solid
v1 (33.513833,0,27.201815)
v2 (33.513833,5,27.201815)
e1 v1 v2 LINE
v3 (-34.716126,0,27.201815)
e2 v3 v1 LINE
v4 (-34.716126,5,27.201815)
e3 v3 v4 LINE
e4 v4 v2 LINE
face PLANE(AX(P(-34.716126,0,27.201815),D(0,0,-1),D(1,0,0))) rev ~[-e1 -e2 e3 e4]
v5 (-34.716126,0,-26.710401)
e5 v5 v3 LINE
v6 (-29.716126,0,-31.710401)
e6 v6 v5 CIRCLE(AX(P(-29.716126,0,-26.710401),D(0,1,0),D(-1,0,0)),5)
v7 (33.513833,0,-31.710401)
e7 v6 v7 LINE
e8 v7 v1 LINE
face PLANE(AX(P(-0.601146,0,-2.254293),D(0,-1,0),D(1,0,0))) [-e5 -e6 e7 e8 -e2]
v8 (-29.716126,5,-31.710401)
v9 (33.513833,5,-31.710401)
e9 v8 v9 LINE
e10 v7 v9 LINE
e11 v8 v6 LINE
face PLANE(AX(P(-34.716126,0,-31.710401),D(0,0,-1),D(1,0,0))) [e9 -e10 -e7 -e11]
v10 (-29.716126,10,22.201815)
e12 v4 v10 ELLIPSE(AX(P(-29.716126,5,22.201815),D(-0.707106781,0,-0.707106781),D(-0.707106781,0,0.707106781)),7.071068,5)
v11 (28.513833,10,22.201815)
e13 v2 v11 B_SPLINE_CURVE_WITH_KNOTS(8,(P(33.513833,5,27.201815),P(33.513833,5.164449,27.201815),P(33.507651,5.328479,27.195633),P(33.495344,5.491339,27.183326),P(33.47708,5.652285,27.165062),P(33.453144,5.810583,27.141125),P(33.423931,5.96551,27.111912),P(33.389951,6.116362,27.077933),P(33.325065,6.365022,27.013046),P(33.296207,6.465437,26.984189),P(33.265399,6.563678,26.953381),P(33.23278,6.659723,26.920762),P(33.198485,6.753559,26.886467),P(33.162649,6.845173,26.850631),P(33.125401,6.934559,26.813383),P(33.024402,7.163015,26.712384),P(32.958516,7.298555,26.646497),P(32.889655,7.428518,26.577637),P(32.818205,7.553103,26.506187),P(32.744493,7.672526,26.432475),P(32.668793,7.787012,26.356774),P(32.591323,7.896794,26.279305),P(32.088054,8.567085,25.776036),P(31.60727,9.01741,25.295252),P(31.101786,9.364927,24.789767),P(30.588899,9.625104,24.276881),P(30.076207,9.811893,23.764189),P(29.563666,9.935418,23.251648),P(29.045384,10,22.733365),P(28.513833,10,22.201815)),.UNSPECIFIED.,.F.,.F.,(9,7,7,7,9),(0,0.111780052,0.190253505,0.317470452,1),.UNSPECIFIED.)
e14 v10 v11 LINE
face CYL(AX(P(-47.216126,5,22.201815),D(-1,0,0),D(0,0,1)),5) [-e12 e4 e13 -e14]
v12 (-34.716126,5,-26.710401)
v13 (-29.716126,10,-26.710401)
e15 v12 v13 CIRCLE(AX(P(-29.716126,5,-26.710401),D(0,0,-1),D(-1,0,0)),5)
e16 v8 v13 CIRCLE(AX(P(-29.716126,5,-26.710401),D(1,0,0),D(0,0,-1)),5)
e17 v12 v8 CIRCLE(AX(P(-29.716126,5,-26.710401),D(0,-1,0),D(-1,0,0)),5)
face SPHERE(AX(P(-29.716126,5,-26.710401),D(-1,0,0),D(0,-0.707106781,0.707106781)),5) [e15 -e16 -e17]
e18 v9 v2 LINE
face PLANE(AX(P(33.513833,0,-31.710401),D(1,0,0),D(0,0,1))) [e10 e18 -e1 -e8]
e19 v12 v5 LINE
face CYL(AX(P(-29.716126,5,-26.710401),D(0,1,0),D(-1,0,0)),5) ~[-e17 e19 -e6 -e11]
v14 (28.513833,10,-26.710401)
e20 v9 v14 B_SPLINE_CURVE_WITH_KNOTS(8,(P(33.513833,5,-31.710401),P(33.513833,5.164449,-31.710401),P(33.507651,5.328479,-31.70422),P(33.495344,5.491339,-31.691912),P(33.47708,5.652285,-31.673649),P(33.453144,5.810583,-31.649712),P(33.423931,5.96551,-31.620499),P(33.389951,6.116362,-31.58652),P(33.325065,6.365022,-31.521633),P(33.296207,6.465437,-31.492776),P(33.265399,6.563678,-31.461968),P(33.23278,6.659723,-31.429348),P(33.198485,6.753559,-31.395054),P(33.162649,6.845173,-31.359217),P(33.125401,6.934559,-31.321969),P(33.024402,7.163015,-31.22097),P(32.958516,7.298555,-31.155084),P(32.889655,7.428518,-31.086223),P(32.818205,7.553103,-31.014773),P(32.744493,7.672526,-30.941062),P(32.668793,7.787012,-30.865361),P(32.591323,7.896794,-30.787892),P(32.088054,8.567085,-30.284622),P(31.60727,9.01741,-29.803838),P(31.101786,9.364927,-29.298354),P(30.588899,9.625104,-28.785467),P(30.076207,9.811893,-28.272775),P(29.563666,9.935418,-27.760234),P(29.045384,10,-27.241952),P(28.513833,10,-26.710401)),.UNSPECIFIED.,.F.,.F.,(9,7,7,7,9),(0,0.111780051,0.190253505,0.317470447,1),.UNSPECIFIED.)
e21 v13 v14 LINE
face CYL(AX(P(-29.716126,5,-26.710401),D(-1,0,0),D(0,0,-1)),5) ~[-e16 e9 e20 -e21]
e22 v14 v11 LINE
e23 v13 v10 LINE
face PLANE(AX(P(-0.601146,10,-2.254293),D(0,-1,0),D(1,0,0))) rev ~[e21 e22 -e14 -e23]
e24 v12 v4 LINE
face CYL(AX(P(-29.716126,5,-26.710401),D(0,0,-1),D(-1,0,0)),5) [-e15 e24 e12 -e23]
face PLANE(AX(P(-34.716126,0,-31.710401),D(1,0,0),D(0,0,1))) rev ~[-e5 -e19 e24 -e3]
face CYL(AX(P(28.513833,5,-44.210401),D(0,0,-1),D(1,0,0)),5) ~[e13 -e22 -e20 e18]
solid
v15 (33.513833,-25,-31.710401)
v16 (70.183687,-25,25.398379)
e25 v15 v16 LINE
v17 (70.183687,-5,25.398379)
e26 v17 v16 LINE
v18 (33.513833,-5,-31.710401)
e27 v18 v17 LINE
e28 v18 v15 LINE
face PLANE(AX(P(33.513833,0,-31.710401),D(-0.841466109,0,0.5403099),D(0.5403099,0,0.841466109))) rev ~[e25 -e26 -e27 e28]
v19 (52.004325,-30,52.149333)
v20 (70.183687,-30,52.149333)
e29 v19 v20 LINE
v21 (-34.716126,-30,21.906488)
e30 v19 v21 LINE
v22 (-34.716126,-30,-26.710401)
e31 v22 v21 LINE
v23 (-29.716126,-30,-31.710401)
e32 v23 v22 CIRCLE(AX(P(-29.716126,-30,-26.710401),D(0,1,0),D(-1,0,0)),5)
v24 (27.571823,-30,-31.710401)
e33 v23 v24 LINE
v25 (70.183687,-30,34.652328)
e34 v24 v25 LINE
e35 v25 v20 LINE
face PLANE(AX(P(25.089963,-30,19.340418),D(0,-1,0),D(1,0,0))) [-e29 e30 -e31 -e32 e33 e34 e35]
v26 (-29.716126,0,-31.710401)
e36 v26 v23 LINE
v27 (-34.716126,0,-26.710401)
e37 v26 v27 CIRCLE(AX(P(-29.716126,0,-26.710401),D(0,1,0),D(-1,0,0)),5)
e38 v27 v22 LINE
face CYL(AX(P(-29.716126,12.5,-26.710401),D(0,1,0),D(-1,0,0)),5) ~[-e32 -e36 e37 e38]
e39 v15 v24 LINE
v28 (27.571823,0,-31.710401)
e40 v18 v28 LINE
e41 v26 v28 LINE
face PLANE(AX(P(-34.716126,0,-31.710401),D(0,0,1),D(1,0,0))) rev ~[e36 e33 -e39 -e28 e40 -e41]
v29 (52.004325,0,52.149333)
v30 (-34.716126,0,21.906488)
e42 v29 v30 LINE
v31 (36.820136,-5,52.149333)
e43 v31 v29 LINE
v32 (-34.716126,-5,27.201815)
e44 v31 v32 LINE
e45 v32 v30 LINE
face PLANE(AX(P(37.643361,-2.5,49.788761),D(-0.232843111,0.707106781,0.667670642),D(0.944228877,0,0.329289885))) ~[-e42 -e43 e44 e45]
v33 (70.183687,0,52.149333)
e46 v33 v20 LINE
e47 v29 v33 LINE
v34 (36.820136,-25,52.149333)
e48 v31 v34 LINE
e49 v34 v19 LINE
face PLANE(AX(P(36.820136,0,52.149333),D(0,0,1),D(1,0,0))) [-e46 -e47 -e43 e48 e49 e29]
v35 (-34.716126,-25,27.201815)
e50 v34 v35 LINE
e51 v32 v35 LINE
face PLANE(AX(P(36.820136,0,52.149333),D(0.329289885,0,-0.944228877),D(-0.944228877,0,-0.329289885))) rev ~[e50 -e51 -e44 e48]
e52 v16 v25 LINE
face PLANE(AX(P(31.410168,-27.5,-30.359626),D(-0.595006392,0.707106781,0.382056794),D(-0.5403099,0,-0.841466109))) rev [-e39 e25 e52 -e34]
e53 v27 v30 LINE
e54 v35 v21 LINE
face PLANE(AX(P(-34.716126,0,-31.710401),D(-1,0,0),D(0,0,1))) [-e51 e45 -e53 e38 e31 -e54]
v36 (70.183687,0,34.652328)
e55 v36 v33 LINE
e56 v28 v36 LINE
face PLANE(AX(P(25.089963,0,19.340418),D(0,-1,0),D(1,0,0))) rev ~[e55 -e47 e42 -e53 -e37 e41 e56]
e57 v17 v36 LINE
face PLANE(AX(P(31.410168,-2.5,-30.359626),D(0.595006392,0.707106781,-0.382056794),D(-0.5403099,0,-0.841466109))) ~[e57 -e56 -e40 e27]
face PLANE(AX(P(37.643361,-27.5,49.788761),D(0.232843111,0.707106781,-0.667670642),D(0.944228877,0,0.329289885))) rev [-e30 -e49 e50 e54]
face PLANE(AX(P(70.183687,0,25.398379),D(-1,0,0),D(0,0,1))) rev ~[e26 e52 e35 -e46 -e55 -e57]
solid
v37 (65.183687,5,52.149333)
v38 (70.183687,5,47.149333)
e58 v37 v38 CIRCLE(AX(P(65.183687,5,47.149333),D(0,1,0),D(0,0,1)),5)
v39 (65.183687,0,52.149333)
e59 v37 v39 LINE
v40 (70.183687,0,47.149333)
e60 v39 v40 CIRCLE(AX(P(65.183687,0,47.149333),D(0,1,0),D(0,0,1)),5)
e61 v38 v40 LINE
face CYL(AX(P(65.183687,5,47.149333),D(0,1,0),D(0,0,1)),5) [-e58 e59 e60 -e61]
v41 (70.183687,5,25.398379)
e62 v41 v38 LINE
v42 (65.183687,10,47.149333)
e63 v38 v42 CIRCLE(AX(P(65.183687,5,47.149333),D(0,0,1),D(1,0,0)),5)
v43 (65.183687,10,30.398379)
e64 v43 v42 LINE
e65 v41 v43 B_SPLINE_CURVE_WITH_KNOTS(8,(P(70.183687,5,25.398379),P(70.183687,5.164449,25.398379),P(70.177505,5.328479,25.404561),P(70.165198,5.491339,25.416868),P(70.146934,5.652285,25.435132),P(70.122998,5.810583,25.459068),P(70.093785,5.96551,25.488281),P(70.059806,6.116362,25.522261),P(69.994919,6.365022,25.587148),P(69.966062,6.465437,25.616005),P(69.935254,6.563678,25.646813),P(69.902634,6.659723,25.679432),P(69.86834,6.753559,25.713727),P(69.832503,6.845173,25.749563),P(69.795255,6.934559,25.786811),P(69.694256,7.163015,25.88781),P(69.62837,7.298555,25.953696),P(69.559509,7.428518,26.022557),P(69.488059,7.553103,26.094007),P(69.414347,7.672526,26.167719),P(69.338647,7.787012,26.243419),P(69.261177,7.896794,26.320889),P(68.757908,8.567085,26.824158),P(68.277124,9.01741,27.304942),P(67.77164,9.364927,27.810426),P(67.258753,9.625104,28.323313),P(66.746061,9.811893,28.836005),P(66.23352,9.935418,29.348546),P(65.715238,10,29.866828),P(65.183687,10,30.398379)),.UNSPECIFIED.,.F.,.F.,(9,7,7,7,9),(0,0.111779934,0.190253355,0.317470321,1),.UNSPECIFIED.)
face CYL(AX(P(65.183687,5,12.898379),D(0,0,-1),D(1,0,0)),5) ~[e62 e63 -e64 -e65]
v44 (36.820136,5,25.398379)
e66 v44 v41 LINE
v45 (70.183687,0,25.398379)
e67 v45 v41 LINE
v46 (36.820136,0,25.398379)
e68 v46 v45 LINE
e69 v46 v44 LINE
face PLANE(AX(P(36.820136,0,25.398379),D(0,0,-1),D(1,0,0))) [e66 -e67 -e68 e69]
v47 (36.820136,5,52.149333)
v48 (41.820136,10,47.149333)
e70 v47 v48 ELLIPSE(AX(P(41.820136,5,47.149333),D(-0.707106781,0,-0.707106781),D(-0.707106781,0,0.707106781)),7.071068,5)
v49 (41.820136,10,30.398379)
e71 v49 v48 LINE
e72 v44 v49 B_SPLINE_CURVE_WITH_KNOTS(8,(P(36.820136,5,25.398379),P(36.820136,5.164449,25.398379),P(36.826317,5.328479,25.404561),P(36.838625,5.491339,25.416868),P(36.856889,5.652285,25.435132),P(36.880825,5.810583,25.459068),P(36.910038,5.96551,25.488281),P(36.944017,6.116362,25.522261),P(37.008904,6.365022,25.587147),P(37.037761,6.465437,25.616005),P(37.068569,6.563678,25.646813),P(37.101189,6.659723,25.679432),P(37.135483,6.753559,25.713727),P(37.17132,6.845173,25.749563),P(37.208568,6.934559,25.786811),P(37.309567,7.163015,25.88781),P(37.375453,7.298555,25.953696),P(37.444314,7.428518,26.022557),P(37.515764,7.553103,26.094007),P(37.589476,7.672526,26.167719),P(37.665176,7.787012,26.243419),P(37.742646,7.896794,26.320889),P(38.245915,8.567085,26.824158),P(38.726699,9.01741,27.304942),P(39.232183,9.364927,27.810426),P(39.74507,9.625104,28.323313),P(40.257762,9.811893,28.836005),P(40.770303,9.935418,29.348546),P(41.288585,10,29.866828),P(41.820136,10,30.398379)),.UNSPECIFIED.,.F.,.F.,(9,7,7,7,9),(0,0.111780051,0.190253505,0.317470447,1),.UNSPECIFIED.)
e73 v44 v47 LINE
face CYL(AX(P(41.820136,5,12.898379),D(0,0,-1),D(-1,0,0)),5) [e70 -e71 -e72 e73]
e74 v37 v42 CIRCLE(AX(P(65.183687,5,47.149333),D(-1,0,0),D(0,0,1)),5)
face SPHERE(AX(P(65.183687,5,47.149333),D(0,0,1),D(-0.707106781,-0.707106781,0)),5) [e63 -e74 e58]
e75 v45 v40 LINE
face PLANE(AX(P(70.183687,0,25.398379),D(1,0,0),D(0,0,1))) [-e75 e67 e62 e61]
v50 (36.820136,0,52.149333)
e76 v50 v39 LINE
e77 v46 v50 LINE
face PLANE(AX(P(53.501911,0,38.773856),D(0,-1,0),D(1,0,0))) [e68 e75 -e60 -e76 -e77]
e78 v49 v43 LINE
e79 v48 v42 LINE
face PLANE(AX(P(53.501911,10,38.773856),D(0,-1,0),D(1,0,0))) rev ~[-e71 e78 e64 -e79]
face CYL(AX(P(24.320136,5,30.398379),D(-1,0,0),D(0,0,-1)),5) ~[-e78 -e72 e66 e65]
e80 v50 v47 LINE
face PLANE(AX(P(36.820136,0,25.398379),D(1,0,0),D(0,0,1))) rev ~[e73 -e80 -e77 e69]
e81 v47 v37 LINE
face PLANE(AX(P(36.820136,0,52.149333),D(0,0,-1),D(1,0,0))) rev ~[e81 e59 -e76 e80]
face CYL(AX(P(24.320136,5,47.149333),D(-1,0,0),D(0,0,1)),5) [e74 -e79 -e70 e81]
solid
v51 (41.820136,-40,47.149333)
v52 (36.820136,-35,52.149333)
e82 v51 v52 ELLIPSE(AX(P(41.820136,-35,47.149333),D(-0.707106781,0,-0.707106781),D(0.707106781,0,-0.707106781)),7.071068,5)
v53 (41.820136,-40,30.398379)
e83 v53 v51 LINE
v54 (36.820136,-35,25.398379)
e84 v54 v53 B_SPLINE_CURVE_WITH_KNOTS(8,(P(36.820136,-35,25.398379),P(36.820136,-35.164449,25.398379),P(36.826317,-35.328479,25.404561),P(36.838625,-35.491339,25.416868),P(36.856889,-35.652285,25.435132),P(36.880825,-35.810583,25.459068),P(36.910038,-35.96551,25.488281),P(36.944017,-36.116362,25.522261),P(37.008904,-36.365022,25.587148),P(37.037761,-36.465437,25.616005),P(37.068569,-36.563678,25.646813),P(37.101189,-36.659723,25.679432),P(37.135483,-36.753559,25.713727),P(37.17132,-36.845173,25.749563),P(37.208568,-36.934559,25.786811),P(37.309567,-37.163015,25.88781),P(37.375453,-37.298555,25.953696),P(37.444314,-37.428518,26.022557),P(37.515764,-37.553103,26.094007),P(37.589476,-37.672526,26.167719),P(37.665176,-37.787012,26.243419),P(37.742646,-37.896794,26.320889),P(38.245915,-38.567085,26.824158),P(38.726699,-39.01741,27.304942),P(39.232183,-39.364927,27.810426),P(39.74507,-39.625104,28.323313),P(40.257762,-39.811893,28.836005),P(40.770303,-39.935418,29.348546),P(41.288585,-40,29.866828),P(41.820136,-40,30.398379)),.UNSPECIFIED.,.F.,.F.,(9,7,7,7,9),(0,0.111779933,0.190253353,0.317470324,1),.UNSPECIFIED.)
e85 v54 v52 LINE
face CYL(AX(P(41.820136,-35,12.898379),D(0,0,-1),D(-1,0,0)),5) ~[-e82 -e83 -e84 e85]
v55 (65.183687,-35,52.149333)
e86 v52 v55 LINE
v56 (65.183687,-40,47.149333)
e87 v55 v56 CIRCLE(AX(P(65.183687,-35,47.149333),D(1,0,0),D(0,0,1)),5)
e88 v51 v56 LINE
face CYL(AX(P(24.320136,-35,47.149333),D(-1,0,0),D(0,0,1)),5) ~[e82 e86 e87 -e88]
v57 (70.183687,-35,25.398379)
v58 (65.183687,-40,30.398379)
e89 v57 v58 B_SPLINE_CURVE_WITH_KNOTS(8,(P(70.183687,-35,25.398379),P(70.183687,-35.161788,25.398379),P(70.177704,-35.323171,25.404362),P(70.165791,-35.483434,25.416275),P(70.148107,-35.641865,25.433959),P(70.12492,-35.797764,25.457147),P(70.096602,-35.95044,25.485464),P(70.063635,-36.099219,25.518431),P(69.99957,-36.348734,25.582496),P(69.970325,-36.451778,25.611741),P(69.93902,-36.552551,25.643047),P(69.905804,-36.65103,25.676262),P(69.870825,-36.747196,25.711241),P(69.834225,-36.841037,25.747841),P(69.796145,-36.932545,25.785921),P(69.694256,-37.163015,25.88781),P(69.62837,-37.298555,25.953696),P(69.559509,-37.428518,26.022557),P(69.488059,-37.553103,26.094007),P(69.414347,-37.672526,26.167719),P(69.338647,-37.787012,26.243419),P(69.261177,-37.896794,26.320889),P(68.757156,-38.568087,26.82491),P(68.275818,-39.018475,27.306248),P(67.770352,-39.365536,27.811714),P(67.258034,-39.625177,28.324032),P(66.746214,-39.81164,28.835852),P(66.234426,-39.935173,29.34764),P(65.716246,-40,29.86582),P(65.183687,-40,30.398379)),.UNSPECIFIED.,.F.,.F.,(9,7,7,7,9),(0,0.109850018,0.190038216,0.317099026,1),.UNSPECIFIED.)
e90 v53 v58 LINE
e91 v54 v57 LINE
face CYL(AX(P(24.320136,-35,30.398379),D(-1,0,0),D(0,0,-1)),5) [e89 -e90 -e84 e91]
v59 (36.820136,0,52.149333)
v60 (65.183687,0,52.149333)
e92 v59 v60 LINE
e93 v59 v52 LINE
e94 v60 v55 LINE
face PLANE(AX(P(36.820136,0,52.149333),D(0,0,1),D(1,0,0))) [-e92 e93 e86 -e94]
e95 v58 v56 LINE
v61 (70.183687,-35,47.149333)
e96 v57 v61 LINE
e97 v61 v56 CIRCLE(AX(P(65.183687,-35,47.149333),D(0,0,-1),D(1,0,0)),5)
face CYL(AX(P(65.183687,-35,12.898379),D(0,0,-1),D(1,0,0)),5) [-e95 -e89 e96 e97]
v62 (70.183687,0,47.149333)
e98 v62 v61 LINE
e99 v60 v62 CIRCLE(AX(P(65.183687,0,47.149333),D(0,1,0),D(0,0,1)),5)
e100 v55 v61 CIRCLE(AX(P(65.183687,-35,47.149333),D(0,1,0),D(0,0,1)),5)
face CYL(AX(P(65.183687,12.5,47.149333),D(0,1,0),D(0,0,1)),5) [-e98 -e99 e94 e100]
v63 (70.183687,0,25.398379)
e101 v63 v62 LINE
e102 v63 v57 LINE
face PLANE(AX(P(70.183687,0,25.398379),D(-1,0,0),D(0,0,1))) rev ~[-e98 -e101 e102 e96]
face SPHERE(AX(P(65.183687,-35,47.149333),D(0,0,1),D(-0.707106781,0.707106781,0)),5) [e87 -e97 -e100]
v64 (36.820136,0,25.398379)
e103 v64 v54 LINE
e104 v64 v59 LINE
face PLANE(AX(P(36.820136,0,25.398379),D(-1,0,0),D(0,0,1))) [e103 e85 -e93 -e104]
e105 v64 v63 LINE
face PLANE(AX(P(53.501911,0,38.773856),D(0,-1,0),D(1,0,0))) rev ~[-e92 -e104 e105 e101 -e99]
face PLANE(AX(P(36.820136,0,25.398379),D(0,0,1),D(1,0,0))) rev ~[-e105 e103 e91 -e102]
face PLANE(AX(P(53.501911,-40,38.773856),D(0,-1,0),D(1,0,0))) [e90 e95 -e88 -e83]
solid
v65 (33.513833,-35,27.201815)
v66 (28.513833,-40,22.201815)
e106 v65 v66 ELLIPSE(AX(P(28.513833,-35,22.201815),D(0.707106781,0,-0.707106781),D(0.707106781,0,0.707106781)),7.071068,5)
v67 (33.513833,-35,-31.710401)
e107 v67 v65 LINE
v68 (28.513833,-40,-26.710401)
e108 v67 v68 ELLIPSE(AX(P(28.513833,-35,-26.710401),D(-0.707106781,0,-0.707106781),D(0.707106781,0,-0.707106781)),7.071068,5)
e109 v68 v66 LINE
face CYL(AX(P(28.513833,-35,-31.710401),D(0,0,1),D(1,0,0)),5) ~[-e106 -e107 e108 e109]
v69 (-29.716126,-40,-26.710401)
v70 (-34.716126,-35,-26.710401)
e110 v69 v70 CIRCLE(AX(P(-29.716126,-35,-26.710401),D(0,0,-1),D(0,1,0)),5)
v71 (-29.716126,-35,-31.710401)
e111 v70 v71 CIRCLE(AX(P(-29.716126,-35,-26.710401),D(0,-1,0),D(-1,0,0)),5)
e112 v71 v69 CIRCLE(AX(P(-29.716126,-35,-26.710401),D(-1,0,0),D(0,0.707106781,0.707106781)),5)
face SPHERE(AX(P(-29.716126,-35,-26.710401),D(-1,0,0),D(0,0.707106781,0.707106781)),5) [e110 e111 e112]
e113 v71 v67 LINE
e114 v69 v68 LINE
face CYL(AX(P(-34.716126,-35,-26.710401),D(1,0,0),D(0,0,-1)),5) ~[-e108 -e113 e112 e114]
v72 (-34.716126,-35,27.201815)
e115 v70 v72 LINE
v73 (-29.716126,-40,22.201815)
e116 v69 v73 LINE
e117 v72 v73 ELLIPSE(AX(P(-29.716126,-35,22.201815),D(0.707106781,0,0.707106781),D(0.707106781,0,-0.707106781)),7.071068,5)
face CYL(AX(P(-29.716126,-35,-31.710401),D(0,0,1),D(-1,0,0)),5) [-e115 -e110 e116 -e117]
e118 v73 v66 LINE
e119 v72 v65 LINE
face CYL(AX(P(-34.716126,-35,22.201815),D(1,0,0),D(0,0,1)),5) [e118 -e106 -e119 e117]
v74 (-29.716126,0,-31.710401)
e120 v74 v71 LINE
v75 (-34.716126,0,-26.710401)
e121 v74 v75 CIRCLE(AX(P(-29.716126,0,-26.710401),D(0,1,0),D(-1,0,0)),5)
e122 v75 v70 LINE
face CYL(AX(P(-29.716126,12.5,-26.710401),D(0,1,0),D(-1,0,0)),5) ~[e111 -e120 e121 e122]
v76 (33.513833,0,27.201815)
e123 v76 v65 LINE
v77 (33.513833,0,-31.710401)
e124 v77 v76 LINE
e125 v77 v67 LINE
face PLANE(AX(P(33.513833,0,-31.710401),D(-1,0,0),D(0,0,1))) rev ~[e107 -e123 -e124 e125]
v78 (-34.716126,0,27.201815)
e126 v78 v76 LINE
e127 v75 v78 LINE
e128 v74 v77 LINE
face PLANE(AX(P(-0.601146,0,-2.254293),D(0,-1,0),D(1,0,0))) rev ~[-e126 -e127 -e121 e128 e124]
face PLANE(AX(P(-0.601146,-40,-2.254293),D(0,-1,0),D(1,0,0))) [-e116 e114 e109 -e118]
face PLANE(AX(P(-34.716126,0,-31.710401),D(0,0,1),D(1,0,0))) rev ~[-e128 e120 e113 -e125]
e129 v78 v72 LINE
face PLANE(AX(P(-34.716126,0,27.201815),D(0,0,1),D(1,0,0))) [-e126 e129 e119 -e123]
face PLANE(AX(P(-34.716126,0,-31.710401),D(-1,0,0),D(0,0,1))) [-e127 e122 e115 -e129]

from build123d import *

# Parameters (mm, degrees)
F0_W           = 68.229958415
F0_H           = 58.9122157544
F1_DEPTH       = 40
F0_W_2         = 33.3635509014
F0_H_2         = 26.750953868
F2_DEPTH       = 30
F3_R           = 5
F4_SIZE        = 5
F5_DEPTH       = 10
F6_T1_DEPTH    = 47.5
F6_S5_W        = 5
F6_S5_H        = 5
F6_T6_DEPTH    = 5
F6_2_T1_DEPTH  = 51.750953868
F6_2_T3_DEPTH  = 34.250953868
F6_2_T5_DEPTH  = 58.3635509014
F6_2_T7_DEPTH  = 40.8635509014
F6_2_T9_DEPTH  = 47.5
F6_2_S13_W     = 5
F6_2_S13_H     = 5
F6_2_T14_DEPTH = 5
F6_3_T1_DEPTH  = 55
F6_4_T1_DEPTH  = 93.229958415
F6_4_T3_DEPTH  = 83.9122157544
F6_4_T5_DEPTH  = 66.4122157544
F6_4_T7_DEPTH  = 75.729958415
F6_4_T9_DEPTH  = 17.5
F6_4_S13_W     = 5
F6_4_S13_H     = 5
F6_4_T14_DEPTH = 5
F6_5_T1_DEPTH  = 40.8635509014
F6_5_T3_DEPTH  = 34.250953868
F6_5_T5_DEPTH  = 58.3635509014
F6_5_T7_DEPTH  = 51.750953868
F6_5_T9_DEPTH  = 17.5
F6_5_S13_W     = 5
F6_5_S13_H     = 5
F6_5_T14_DEPTH = 5


# Not quite as in the source:
# - a fillet or chamfer that OpenCascade refuses, or shapes differently, is made with other operations: its cross-section is extruded or revolved along the edge and cut away or added


with BuildPart() as f1:
    # F0 (on Front) → F1 (new body)
    with BuildSketch(Plane.XZ):
        with Locations((-0.6011463702, -2.2542933002)):
            Rectangle(F0_W, F0_H)
    extrude(amount=F1_DEPTH)

    # F3
    f3_edges = [f1.edges().sort_by_distance(p)[0] for p in [
        (-0.601146, -40, 27.201815),
        (-34.716126, -40, -2.254293),
        (-0.601146, -40, -31.710401),
        (33.513833, -40, -2.254293),
    ]]
    fillet(f3_edges, radius=F3_R)


with BuildPart() as f1b:
    # F0 (on Front) → F1, piece 2 (new body)
    with BuildSketch(Plane.XZ):
        with Locations((53.5019114614, 38.7738561258)):
            Rectangle(F0_W_2, F0_H_2)
    extrude(amount=F1_DEPTH)


with BuildPart() as f2:
    # F0 (on Front) → F2 (new body)
    with BuildSketch(Plane.XZ):
        Polygon((36.8201360106, 52.1493330598), (-34.7161255777, 27.201814577), (33.5138328373, 27.201814577), (33.5138328373, -31.7104011774), (70.1836869121, 25.3983791918), (36.8201360106, 25.3983791918), align=None)
        with Locations((-0.6011463702, -2.2542933002)):
            Rectangle(F0_W, F0_H)
        with Locations((53.5019114614, 38.7738561258)):
            Rectangle(F0_W_2, F0_H_2)
    extrude(amount=F2_DEPTH)

    # F4
    f4_edges = [f2.edges().sort_by_distance(p)[0] for p in [
        (1.052005, -30, 39.675574),
        (1.052005, 0, 39.675574),
        (51.84876, -30, -3.156011),
        (51.84876, 0, -3.156011),
    ]]
    chamfer(f4_edges, length=F4_SIZE)

    # F6#3: fillet of radius 5 on 1 edges, made by hand

    # F6_3_s2 → F6_3_t1 (cut)
    with BuildSketch(Plane.XZ.offset(-12.5)):
        with BuildLine():
            ThreePointArc((-34.7161255777, -26.7104011774), (-33.2516594836, -30.2459350833), (-29.7161255777, -31.7104011774))
            Line((-29.7161255777, -31.7104011774), (-34.7161255777, -31.7104011774))
            Line((-34.7161255777, -31.7104011774), (-34.7161255777, -26.7104011774))
        make_face()
    extrude(amount=F6_3_T1_DEPTH, mode=Mode.SUBTRACT)


with BuildPart() as f5:
    # F5 (new): a face of the model
    f5_faces = [f1.part.faces().sort_by_distance(p)[0] for p in [
        (-0.6011463702, 0, -2.2542933002),
    ]]
    extrude(f5_faces, amount=F5_DEPTH)

    # F6#4: fillet of radius 5 on 5 edges, made by hand

    # F6_4_s2 → F6_4_t1 (cut)
    with BuildSketch(Plane.YZ.offset(-47.2161255777)):
        with BuildLine():
            ThreePointArc((5, 27.201814577), (8.5355339059, 25.7373484829), (10, 22.201814577))
            Line((10, 22.201814577), (10, 27.201814577))
            Line((10, 27.201814577), (5, 27.201814577))
        make_face()
    extrude(amount=F6_4_T1_DEPTH, mode=Mode.SUBTRACT)

    # F6_4_s4 → F6_4_t3 (cut)
    with BuildSketch(Plane.XY.offset(-44.2104011774)):
        with BuildLine():
            ThreePointArc((33.5138328373, 5), (32.0493667433, 8.5355339059), (28.5138328373, 10))
            Line((28.5138328373, 10), (33.5138328373, 10))
            Line((33.5138328373, 10), (33.5138328373, 5))
        make_face()
    extrude(amount=F6_4_T3_DEPTH, mode=Mode.SUBTRACT)

    # F6_4_s6 → F6_4_t5 (cut)
    with BuildSketch(Plane.XY.offset(-26.7104011774)):
        with BuildLine():
            ThreePointArc((-34.7161255777, 5), (-33.2516594836, 8.5355339059), (-29.7161255777, 10))
            Line((-29.7161255777, 10), (-34.7161255777, 10))
            Line((-34.7161255777, 10), (-34.7161255777, 5))
        make_face()
    extrude(amount=F6_4_T5_DEPTH, mode=Mode.SUBTRACT)

    # F6_4_s8 → F6_4_t7 (cut)
    with BuildSketch(Plane.YZ.offset(-29.7161255777)):
        with BuildLine():
            ThreePointArc((5, -31.7104011774), (8.5355339059, -30.2459350833), (10, -26.7104011774))
            Line((10, -26.7104011774), (10, -31.7104011774))
            Line((10, -31.7104011774), (5, -31.7104011774))
        make_face()
    extrude(amount=F6_4_T7_DEPTH, mode=Mode.SUBTRACT)

    # F6_4_s10 → F6_4_t9 (cut)
    with BuildSketch(Plane.XZ.offset(-5)):
        with BuildLine():
            ThreePointArc((-34.7161255777, -26.7104011774), (-33.2516594836, -30.2459350833), (-29.7161255777, -31.7104011774))
            Line((-29.7161255777, -31.7104011774), (-34.7161255777, -31.7104011774))
            Line((-34.7161255777, -31.7104011774), (-34.7161255777, -26.7104011774))
        make_face()
    extrude(amount=F6_4_T9_DEPTH, mode=Mode.SUBTRACT)


with BuildPart() as f5b:
    # F5#2 (new): a face of the model
    f5_2_faces = [f1b.part.faces().sort_by_distance(p)[0] for p in [
        (53.5019114614, 0, 38.7738561258),
    ]]
    extrude(f5_2_faces, amount=F5_DEPTH)

    # F6#5: fillet of radius 5 on 5 edges, made by hand

    # F6_5_s2 → F6_5_t1 (cut)
    with BuildSketch(Plane.YZ.offset(24.3201360106)):
        with BuildLine():
            ThreePointArc((5, 52.1493330598), (8.5355339059, 50.6848669657), (10, 47.1493330598))
            Line((10, 47.1493330598), (10, 52.1493330598))
            Line((10, 52.1493330598), (5, 52.1493330598))
        make_face()
    extrude(amount=F6_5_T1_DEPTH, mode=Mode.SUBTRACT)

    # F6_5_s4 → F6_5_t3 (cut)
    with BuildSketch(Plane.XY.offset(12.8983791918)):
        with BuildLine():
            ThreePointArc((70.1836869121, 5), (68.719220818, 8.5355339059), (65.1836869121, 10))
            Line((65.1836869121, 10), (70.1836869121, 10))
            Line((70.1836869121, 10), (70.1836869121, 5))
        make_face()
    extrude(amount=F6_5_T3_DEPTH, mode=Mode.SUBTRACT)

    # F6_5_s6 → F6_5_t5 (cut)
    with BuildSketch(Plane.YZ.offset(24.3201360106)):
        with BuildLine():
            ThreePointArc((5, 25.3983791918), (8.5355339059, 26.8628452858), (10, 30.3983791918))
            Line((10, 30.3983791918), (10, 25.3983791918))
            Line((10, 25.3983791918), (5, 25.3983791918))
        make_face()
    extrude(amount=F6_5_T5_DEPTH, mode=Mode.SUBTRACT)

    # F6_5_s8 → F6_5_t7 (cut)
    with BuildSketch(Plane.XY.offset(12.8983791918)):
        with BuildLine():
            ThreePointArc((36.8201360106, 5), (38.2846021047, 8.5355339059), (41.8201360106, 10))
            Line((41.8201360106, 10), (36.8201360106, 10))
            Line((36.8201360106, 10), (36.8201360106, 5))
        make_face()
    extrude(amount=F6_5_T7_DEPTH, mode=Mode.SUBTRACT)

    # F6_5_s10 → F6_5_t9 (cut)
    with BuildSketch(Plane.XZ.offset(-5)):
        with BuildLine():
            ThreePointArc((65.1836869121, 52.1493330598), (68.719220818, 50.6848669657), (70.1836869121, 47.1493330598))
            Line((70.1836869121, 47.1493330598), (70.1836869121, 52.1493330598))
            Line((70.1836869121, 52.1493330598), (65.1836869121, 52.1493330598))
        make_face()
    extrude(amount=F6_5_T9_DEPTH, mode=Mode.SUBTRACT)


with BuildPart() as f1_1:
    add(f1.part)

    # F6: fillet of radius 5 on 1 edges, made by hand

    # F6_s2 → F6_t1 (cut)
    with BuildSketch(Plane.XZ.offset(-12.5)):
        with BuildLine():
            ThreePointArc((-34.7161255777, -26.7104011774), (-33.2516594836, -30.2459350833), (-29.7161255777, -31.7104011774))
            Line((-29.7161255777, -31.7104011774), (-34.7161255777, -31.7104011774))
            Line((-34.7161255777, -31.7104011774), (-34.7161255777, -26.7104011774))
        make_face()
    extrude(amount=F6_T1_DEPTH, mode=Mode.SUBTRACT)


with BuildPart() as f6_tool4:
    # F6_s5 → F6_t6 (new body)
    with BuildSketch(Plane.YZ.offset(-29.7161255777)):
        with Locations((-37.5, -29.2104011774)):
            Rectangle(F6_S5_W, F6_S5_H)
    extrude(amount=-F6_T6_DEPTH)

    # F6_s7 → F6_t8 (revolve, cut)
    with BuildSketch(Plane(origin=(-29.7161255777, -35, -26.7104011774), x_dir=(0, 0.7071067812, 0.7071067812), z_dir=(0, -0.7071067812, 0.7071067812))):
        with BuildLine():
            ThreePointArc((0, -5), (5, 0), (0, 5))
            Line((0, 5), (0, -5))
        make_face()
    revolve(axis=Axis((-29.7161255777, -35, -26.7104011774), (-1, 0, 0)), mode=Mode.SUBTRACT)


with BuildPart() as f1_2:
    add(f1_1.part)

    # F6_t3: cut F6_tool4
    add(f6_tool4.part, mode=Mode.SUBTRACT)


with BuildPart() as f1b_1:
    add(f1b.part)

    # F6#2: fillet of radius 5 on 5 edges, made by hand

    # F6_2_s2 → F6_2_t1 (cut)
    with BuildSketch(Plane.XY.offset(12.8983791918)):
        with BuildLine():
            ThreePointArc((36.8201360106, -35), (38.2846021047, -38.5355339059), (41.8201360106, -40))
            Line((41.8201360106, -40), (36.8201360106, -40))
            Line((36.8201360106, -40), (36.8201360106, -35))
        make_face()
    extrude(amount=F6_2_T1_DEPTH, mode=Mode.SUBTRACT)

    # F6_2_s4 → F6_2_t3 (cut)
    with BuildSketch(Plane.XY.offset(12.8983791918)):
        with BuildLine():
            ThreePointArc((70.1836869121, -35), (68.719220818, -38.5355339059), (65.1836869121, -40))
            Line((65.1836869121, -40), (70.1836869121, -40))
            Line((70.1836869121, -40), (70.1836869121, -35))
        make_face()
    extrude(amount=F6_2_T3_DEPTH, mode=Mode.SUBTRACT)

    # F6_2_s6 → F6_2_t5 (cut)
    with BuildSketch(Plane.YZ.offset(24.3201360106)):
        with BuildLine():
            ThreePointArc((-35, 25.3983791918), (-38.5355339059, 26.8628452858), (-40, 30.3983791918))
            Line((-40, 30.3983791918), (-40, 25.3983791918))
            Line((-40, 25.3983791918), (-35, 25.3983791918))
        make_face()
    extrude(amount=F6_2_T5_DEPTH, mode=Mode.SUBTRACT)

    # F6_2_s8 → F6_2_t7 (cut)
    with BuildSketch(Plane.YZ.offset(24.3201360106)):
        with BuildLine():
            ThreePointArc((-35, 52.1493330598), (-38.5355339059, 50.6848669657), (-40, 47.1493330598))
            Line((-40, 47.1493330598), (-40, 52.1493330598))
            Line((-40, 52.1493330598), (-35, 52.1493330598))
        make_face()
    extrude(amount=F6_2_T7_DEPTH, mode=Mode.SUBTRACT)

    # F6_2_s10 → F6_2_t9 (cut)
    with BuildSketch(Plane.XZ.offset(-12.5)):
        with BuildLine():
            ThreePointArc((65.1836869121, 52.1493330598), (68.719220818, 50.6848669657), (70.1836869121, 47.1493330598))
            Line((70.1836869121, 47.1493330598), (70.1836869121, 52.1493330598))
            Line((70.1836869121, 52.1493330598), (65.1836869121, 52.1493330598))
        make_face()
    extrude(amount=F6_2_T9_DEPTH, mode=Mode.SUBTRACT)


with BuildPart() as f6_2_tool12:
    # F6_2_s13 → F6_2_t14 (new body)
    with BuildSketch(Plane.XY.offset(47.1493330598)):
        with Locations((67.6836869121, -37.5)):
            Rectangle(F6_2_S13_W, F6_2_S13_H)
    extrude(amount=F6_2_T14_DEPTH)

    # F6_2_s15 → F6_2_t16 (revolve, cut)
    with BuildSketch(Plane(origin=(65.1836869121, -35, 47.1493330598), x_dir=(-0.7071067812, 0.7071067812, 0), z_dir=(0.7071067812, 0.7071067812, 0))):
        with BuildLine():
            ThreePointArc((0, -5), (5, 0), (0, 5))
            Line((0, 5), (0, -5))
        make_face()
    revolve(axis=Axis((65.1836869121, -35, 47.1493330598), (0, 0, 1)), mode=Mode.SUBTRACT)


with BuildPart() as f1b_2:
    add(f1b_1.part)

    # F6_2_t11: cut F6_2_tool12
    add(f6_2_tool12.part, mode=Mode.SUBTRACT)


with BuildPart() as f6_4_tool12:
    # F6_4_s13 → F6_4_t14 (new body)
    with BuildSketch(Plane.YZ.offset(-29.7161255777)):
        with Locations((7.5, -29.2104011774)):
            Rectangle(F6_4_S13_W, F6_4_S13_H)
    extrude(amount=-F6_4_T14_DEPTH)

    # F6_4_s15 → F6_4_t16 (revolve, cut)
    with BuildSketch(Plane(origin=(-29.7161255777, 5, -26.7104011774), x_dir=(0, -0.7071067812, 0.7071067812), z_dir=(0, -0.7071067812, -0.7071067812))):
        with BuildLine():
            ThreePointArc((0, -5), (5, 0), (0, 5))
            Line((0, 5), (0, -5))
        make_face()
    revolve(axis=Axis((-29.7161255777, 5, -26.7104011774), (-1, 0, 0)), mode=Mode.SUBTRACT)


with BuildPart() as f5_1:
    add(f5.part)

    # F6_4_t11: cut F6_4_tool12
    add(f6_4_tool12.part, mode=Mode.SUBTRACT)


with BuildPart() as f6_5_tool12:
    # F6_5_s13 → F6_5_t14 (new body)
    with BuildSketch(Plane.XY.offset(47.1493330598)):
        with Locations((67.6836869121, 7.5)):
            Rectangle(F6_5_S13_W, F6_5_S13_H)
    extrude(amount=F6_5_T14_DEPTH)

    # F6_5_s15 → F6_5_t16 (revolve, cut)
    with BuildSketch(Plane(origin=(65.1836869121, 5, 47.1493330598), x_dir=(-0.7071067812, -0.7071067812, 0), z_dir=(-0.7071067812, 0.7071067812, 0))):
        with BuildLine():
            ThreePointArc((0, -5), (5, 0), (0, 5))
            Line((0, 5), (0, -5))
        make_face()
    revolve(axis=Axis((65.1836869121, 5, 47.1493330598), (0, 0, 1)), mode=Mode.SUBTRACT)


with BuildPart() as f5b_1:
    add(f5b.part)

    # F6_5_t11: cut F6_5_tool12
    add(f6_5_tool12.part, mode=Mode.SUBTRACT)


solid = Compound([f2.part, f1_2.part, f1b_2.part, f5_1.part, f5b_1.part])
